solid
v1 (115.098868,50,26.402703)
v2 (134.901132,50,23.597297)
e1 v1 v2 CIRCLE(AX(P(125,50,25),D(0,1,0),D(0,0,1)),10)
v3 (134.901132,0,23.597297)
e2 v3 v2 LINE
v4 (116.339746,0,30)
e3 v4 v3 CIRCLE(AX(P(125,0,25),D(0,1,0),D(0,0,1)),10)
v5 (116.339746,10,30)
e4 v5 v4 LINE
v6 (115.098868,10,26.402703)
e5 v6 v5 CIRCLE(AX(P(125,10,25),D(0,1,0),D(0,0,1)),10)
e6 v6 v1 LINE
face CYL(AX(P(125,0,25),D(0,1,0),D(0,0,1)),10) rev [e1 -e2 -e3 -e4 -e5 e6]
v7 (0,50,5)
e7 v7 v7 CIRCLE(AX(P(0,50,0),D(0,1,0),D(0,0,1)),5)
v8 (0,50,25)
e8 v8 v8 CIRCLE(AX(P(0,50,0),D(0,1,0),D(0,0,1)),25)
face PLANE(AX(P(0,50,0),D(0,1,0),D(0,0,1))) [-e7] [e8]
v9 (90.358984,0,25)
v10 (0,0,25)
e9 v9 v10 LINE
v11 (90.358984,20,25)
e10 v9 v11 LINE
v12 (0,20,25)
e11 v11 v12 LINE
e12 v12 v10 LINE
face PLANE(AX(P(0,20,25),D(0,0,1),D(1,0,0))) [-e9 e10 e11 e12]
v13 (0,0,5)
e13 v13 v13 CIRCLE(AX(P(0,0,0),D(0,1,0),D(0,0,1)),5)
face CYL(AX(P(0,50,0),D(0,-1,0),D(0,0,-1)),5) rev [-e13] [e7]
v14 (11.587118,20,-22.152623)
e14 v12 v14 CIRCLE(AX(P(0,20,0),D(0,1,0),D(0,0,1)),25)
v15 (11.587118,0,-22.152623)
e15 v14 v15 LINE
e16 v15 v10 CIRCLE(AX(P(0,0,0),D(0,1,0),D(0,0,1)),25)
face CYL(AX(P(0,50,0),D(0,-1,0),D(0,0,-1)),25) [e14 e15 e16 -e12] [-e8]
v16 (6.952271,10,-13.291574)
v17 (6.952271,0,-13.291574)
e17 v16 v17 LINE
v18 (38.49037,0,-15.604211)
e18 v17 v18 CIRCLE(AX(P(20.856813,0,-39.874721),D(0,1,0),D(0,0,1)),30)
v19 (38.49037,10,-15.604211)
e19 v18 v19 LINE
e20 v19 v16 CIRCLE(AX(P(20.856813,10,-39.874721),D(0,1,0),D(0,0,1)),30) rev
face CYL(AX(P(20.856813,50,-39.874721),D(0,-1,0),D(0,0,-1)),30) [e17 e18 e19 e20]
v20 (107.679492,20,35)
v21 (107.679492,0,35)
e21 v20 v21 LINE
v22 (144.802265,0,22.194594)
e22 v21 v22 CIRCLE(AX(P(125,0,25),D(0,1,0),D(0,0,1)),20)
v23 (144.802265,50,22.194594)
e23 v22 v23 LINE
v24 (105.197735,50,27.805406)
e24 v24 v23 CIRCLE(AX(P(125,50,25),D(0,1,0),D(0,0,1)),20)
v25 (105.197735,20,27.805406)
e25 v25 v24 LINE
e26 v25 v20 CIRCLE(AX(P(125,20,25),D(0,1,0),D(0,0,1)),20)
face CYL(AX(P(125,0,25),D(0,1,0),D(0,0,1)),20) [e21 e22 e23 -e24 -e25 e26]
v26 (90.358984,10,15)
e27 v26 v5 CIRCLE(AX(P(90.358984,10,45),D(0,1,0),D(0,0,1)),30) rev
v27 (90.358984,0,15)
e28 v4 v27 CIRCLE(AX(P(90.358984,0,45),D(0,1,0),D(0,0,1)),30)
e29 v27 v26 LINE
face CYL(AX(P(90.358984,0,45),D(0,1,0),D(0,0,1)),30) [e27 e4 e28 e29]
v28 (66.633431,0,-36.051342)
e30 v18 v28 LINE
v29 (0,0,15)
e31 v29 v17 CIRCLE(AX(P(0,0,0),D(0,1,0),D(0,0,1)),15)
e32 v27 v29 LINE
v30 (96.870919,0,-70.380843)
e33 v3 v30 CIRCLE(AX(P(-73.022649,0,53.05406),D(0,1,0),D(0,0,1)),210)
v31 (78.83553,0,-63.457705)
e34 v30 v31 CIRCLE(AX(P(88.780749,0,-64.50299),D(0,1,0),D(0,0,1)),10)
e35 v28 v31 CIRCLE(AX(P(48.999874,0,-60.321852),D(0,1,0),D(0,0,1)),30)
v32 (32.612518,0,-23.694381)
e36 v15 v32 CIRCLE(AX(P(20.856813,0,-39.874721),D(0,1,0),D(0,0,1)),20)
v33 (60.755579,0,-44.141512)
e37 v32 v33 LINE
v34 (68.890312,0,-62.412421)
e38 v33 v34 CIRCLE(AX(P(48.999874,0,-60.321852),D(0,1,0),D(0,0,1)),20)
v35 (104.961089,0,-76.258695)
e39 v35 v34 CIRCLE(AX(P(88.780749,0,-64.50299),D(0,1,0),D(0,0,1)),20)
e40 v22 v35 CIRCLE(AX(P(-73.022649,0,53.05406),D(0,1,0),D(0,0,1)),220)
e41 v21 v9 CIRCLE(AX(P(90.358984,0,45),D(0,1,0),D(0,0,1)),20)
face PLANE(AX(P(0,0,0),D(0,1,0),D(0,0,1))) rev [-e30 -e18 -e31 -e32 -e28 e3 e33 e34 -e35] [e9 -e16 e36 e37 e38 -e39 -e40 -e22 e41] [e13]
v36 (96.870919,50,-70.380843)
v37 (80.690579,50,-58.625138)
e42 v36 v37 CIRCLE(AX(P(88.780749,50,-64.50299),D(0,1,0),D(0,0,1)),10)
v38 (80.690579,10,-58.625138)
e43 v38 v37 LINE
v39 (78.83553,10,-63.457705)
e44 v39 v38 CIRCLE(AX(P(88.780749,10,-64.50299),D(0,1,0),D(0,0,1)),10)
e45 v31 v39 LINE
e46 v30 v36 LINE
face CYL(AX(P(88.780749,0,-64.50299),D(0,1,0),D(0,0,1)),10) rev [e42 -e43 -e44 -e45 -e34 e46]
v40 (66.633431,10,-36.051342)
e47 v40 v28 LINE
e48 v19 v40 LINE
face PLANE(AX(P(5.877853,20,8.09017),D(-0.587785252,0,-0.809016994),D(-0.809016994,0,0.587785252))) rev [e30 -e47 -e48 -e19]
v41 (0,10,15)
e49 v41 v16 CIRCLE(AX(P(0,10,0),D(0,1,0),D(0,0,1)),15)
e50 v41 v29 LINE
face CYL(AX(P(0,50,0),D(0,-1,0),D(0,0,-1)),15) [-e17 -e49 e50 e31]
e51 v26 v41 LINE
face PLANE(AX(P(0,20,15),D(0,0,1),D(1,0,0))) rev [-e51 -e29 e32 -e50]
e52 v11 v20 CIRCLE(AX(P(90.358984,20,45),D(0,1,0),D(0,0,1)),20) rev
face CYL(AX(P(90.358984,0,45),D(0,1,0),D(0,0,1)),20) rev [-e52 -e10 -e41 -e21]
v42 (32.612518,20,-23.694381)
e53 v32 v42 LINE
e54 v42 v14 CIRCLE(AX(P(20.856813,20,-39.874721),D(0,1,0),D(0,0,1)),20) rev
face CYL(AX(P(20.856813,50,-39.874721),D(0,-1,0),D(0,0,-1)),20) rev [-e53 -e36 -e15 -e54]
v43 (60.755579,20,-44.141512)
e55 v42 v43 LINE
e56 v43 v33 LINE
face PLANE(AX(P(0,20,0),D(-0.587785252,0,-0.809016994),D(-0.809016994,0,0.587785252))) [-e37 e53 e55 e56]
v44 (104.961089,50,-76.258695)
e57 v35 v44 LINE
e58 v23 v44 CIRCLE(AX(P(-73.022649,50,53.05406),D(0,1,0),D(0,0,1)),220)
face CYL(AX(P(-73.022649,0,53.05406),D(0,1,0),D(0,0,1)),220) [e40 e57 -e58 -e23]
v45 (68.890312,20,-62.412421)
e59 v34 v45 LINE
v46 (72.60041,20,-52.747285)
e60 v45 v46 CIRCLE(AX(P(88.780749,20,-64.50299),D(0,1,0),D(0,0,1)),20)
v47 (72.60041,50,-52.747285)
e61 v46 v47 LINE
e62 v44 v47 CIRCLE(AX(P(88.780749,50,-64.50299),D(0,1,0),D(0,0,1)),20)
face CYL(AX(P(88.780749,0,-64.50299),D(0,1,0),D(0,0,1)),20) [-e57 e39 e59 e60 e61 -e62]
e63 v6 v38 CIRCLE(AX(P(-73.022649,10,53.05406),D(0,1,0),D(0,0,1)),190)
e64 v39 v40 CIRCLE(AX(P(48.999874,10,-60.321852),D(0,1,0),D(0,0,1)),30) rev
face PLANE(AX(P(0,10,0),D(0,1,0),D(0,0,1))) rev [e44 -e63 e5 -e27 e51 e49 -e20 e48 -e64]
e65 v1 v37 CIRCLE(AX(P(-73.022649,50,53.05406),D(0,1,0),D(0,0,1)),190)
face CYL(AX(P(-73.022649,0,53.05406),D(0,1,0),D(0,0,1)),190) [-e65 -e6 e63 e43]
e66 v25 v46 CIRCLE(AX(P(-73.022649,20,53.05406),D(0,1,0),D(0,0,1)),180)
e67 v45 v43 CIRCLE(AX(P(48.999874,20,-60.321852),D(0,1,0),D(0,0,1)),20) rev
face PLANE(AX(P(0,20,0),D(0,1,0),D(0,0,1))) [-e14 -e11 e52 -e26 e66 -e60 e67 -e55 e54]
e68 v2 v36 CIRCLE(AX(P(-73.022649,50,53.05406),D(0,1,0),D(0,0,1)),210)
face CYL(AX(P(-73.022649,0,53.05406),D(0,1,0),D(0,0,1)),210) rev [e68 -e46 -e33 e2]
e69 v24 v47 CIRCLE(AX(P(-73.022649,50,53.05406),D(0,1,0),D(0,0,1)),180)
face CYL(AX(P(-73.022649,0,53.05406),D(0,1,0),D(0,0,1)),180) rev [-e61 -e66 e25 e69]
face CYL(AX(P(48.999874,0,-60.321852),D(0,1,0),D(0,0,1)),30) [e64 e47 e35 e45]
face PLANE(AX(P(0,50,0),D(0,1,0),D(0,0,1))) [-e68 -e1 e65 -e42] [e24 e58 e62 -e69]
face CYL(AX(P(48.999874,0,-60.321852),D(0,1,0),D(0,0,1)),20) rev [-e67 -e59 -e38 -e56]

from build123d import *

# Parameters (mm, degrees)
SKETCH1_R                = 25
SKETCH1_R_2              = 5
BOSS_EXTRUDE1_DEPTH      = 50
BOSS_EXTRUDE4_DEPTH      = 20
BOSS_EXTRUDE5_DEPTH      = 30
BOSS_EXTRUDE5_DEPTH_BACK = 20
FILLET2_R                = 20
SHELL2_DEPTH             = 40
SHELL2_2_DEPTH           = 10
CUT_EXTRUDE2_DEPTH       = 171.486818667
CUT_EXTRUDE2_DEPTH_BACK  = 171.486818667


# Read off the part's stored shape, not the designer's step: Shell2
with BuildPart() as part:
    # Sketch1 → Boss-Extrude1 (new body)
    with BuildSketch(Plane(origin=(0, 0, 0), x_dir=(1, 0, 0), z_dir=(0, 1, 0))):
        with Locations(Location((0, 0, 0), (0, 0, 270))):
            Circle(SKETCH1_R)
        with Locations(Location((0, 0, 0), (0, 0, 270))):
            Circle(SKETCH1_R_2, mode=Mode.SUBTRACT)
    extrude(amount=BOSS_EXTRUDE1_DEPTH)

    # Sketch3 → Boss-Extrude4 (add)
    with BuildSketch(Plane(origin=(0, 0, 0), x_dir=(1, 0, 0), z_dir=(0, 1, 0))):
        with BuildLine():
            Line((0, -25), (125, -25))
            ThreePointArc((125, -25), (112.372583962, 21.969985307), (88.780749417, 64.502990119))
            Line((88.780749417, 64.502990119), (20.225424859, 14.694631307))
            ThreePointArc((20.225424859, 14.694631307), (23.776412907, 7.725424859), (25, 0))
            ThreePointArc((25, 0), (17.67766953, -17.67766953), (0, -25))
        make_face()
    extrude(amount=BOSS_EXTRUDE4_DEPTH)

    # Sketch4 → Boss-Extrude5 (add, two sides: drawn at the far end of the back side and taken through both)
    with BuildSketch(Plane(origin=(0, 20, 0), x_dir=(1, 0, 0), z_dir=(0, 1, 0)).offset(-BOSS_EXTRUDE5_DEPTH_BACK)):
        with BuildLine():
            ThreePointArc((144.802264946, -22.194593966), (130.912107304, 29.472389872), (104.961089304, 76.258695165))
            ThreePointArc((104.961089304, 76.258695165), (77.025044371, 80.683330007), (72.600409529, 52.747285074))
            ThreePointArc((72.600409529, 52.747285074), (93.83306062, 14.467580743), (105.197735054, -27.805406034))
            ThreePointArc((105.197735054, -27.805406034), (127.805406034, -44.802264946), (144.802264946, -22.194593966))
        make_face()
    extrude(amount=BOSS_EXTRUDE5_DEPTH + BOSS_EXTRUDE5_DEPTH_BACK)

    # Fillet2
    # the kernel refuses this fillet: 20 mm, written as the material it adds along each edge
    with BuildSketch(Plane(origin=(20.225424859, 0, -14.694631307), x_dir=(-0.7569254846609251, 0, -0.6535011940852316), z_dir=(0, 1, 0))) as fillet2_piece_1:
        with BuildLine():
            CenterArc((15.977305143, -19.472064177), FILLET2_R, 103.193899981, 63.612200039)
            Line((-3.494759034, -14.90711985), (0, 0))
            ThreePointArc((0, 0), (5.706180408, -0.659919779), (11.412360816, 0))
        make_face()
    extrude(amount=20)
    with BuildSketch(Plane(origin=(104.777715273, 20, 25), x_dir=(-1, 0, 0), z_dir=(0, -1, 0))) as fillet2_piece_2:
        with BuildLine():
            CenterArc((14.418731424, -20), FILLET2_R, 90, 60)
            Line((-2.901776652, -10), (-4.633827459, -9))
            ThreePointArc((-4.633827459, -9), (-2.400246276, -2.524865431), (-1.975559608, 0.311711782))
            Line((-1.975559608, 0.311711782), (0, 2))
            Line((0, 2), (14.418731424, 2))
            Line((14.418731424, 2), (14.418731424, 0))
        make_face()
    extrude(amount=20)
    with BuildSketch(Plane(origin=(72.600409529, 0, -52.747285074), x_dir=(-0.8090169943749511, 0, 0.5877852522924683), z_dir=(0, 1, 0))) as fillet2_piece_3:
        with BuildLine():
            CenterArc((14.641016151, -20), FILLET2_R, 90, 60)
            ThreePointArc((-2.679491924, -10), (-0.681483474, -5.176380902), (0, 0))
            Line((0, 0), (14.641016151, 0))
        make_face()
    extrude(amount=20)

    # Shell2 outline → Shell2 (cut)
    with BuildSketch(Plane(origin=(0, 0, 0), x_dir=(1, 0, 0), z_dir=(0, 1, 0))):
        with BuildLine():
            ThreePointArc((115.098867527, -26.402703017), (126.402703017, -34.901132473), (134.901132473, -23.597296983))
            ThreePointArc((134.901132473, -23.597296983), (121.642345633, 25.721187589), (96.87091936, 70.380842642))
            ThreePointArc((96.87091936, 70.380842642), (82.902896893, 72.593160063), (80.690579473, 58.625137596))
            ThreePointArc((80.690579473, 58.625137596), (103.102822291, 18.218783025), (115.098867527, -26.402703017))
        make_face()
    extrude(amount=SHELL2_DEPTH, mode=Mode.SUBTRACT)

    # Shell2 2 outline → Shell2 2 (cut)
    with BuildSketch(Plane(origin=(0, 0, 0), x_dir=(1, 0, 0), z_dir=(0, 1, 0))):
        with BuildLine():
            ThreePointArc((6.95227087, 13.291573637), (14.566633183, -3.579552727), (0, -15))
            Line((0, -15), (90.358983849, -15))
            ThreePointArc((90.358983849, -15), (105.358983849, -19.019237886), (116.339745962, -30))
            ThreePointArc((116.339745962, -30), (115.546619457, -28.260919549), (115.098867527, -26.402703017))
            ThreePointArc((115.098867527, -26.402703017), (103.102822291, 18.218783025), (80.690579473, 58.625137596))
            ThreePointArc((80.690579473, 58.625137596), (79.444945152, 60.919310624), (78.835530463, 63.457705487))
            ThreePointArc((78.835530463, 63.457705487), (76.406237331, 48.119752296), (66.633431171, 36.051341757))
            Line((66.633431171, 36.051341757), (38.49037018, 15.604211079))
            ThreePointArc((38.49037018, 15.604211079), (23.050773127, 9.955052843), (6.95227087, 13.291573637))
        make_face()
    extrude(amount=SHELL2_2_DEPTH, mode=Mode.SUBTRACT)

    # Sketch4<3> → Cut-Extrude2 (cut, two sides: drawn at the far end of the back side and taken through both)
    with BuildSketch(Plane(origin=(0, 20, 0), x_dir=(1, 0, 0), z_dir=(0, 1, 0)).offset(-CUT_EXTRUDE2_DEPTH_BACK)):
        with BuildLine():
            Line((125, -25), (114.894805022, -25))
            ThreePointArc((114.894805022, -25), (114.998144363, -25.70116121), (115.098867527, -26.402703017))
            ThreePointArc((115.098867527, -26.402703017), (126.402703017, -34.901132473), (134.901132473, -23.597296983))
            ThreePointArc((134.901132473, -23.597296983), (121.642345633, 25.721187589), (96.87091936, 70.380842642))
            ThreePointArc((96.87091936, 70.380842642), (82.902896894, 72.593160063), (80.690579473, 58.625137596))
            Line((80.690579473, 58.625137596), (88.780749417, 64.502990119))
            ThreePointArc((88.780749417, 64.502990119), (112.372583962, 21.969985307), (125, -25))
        make_face()
        with BuildLine():
            ThreePointArc((80.690579473, 58.625137596), (102.835736386, 18.875266979), (114.894805022, -25))
            Line((114.894805022, -25), (125, -25))
            ThreePointArc((125, -25), (112.372583962, 21.969985307), (88.780749417, 64.502990119))
            Line((88.780749417, 64.502990119), (80.690579473, 58.625137596))
        make_face()
    extrude(amount=CUT_EXTRUDE2_DEPTH + CUT_EXTRUDE2_DEPTH_BACK, mode=Mode.SUBTRACT)


solid = part.part
